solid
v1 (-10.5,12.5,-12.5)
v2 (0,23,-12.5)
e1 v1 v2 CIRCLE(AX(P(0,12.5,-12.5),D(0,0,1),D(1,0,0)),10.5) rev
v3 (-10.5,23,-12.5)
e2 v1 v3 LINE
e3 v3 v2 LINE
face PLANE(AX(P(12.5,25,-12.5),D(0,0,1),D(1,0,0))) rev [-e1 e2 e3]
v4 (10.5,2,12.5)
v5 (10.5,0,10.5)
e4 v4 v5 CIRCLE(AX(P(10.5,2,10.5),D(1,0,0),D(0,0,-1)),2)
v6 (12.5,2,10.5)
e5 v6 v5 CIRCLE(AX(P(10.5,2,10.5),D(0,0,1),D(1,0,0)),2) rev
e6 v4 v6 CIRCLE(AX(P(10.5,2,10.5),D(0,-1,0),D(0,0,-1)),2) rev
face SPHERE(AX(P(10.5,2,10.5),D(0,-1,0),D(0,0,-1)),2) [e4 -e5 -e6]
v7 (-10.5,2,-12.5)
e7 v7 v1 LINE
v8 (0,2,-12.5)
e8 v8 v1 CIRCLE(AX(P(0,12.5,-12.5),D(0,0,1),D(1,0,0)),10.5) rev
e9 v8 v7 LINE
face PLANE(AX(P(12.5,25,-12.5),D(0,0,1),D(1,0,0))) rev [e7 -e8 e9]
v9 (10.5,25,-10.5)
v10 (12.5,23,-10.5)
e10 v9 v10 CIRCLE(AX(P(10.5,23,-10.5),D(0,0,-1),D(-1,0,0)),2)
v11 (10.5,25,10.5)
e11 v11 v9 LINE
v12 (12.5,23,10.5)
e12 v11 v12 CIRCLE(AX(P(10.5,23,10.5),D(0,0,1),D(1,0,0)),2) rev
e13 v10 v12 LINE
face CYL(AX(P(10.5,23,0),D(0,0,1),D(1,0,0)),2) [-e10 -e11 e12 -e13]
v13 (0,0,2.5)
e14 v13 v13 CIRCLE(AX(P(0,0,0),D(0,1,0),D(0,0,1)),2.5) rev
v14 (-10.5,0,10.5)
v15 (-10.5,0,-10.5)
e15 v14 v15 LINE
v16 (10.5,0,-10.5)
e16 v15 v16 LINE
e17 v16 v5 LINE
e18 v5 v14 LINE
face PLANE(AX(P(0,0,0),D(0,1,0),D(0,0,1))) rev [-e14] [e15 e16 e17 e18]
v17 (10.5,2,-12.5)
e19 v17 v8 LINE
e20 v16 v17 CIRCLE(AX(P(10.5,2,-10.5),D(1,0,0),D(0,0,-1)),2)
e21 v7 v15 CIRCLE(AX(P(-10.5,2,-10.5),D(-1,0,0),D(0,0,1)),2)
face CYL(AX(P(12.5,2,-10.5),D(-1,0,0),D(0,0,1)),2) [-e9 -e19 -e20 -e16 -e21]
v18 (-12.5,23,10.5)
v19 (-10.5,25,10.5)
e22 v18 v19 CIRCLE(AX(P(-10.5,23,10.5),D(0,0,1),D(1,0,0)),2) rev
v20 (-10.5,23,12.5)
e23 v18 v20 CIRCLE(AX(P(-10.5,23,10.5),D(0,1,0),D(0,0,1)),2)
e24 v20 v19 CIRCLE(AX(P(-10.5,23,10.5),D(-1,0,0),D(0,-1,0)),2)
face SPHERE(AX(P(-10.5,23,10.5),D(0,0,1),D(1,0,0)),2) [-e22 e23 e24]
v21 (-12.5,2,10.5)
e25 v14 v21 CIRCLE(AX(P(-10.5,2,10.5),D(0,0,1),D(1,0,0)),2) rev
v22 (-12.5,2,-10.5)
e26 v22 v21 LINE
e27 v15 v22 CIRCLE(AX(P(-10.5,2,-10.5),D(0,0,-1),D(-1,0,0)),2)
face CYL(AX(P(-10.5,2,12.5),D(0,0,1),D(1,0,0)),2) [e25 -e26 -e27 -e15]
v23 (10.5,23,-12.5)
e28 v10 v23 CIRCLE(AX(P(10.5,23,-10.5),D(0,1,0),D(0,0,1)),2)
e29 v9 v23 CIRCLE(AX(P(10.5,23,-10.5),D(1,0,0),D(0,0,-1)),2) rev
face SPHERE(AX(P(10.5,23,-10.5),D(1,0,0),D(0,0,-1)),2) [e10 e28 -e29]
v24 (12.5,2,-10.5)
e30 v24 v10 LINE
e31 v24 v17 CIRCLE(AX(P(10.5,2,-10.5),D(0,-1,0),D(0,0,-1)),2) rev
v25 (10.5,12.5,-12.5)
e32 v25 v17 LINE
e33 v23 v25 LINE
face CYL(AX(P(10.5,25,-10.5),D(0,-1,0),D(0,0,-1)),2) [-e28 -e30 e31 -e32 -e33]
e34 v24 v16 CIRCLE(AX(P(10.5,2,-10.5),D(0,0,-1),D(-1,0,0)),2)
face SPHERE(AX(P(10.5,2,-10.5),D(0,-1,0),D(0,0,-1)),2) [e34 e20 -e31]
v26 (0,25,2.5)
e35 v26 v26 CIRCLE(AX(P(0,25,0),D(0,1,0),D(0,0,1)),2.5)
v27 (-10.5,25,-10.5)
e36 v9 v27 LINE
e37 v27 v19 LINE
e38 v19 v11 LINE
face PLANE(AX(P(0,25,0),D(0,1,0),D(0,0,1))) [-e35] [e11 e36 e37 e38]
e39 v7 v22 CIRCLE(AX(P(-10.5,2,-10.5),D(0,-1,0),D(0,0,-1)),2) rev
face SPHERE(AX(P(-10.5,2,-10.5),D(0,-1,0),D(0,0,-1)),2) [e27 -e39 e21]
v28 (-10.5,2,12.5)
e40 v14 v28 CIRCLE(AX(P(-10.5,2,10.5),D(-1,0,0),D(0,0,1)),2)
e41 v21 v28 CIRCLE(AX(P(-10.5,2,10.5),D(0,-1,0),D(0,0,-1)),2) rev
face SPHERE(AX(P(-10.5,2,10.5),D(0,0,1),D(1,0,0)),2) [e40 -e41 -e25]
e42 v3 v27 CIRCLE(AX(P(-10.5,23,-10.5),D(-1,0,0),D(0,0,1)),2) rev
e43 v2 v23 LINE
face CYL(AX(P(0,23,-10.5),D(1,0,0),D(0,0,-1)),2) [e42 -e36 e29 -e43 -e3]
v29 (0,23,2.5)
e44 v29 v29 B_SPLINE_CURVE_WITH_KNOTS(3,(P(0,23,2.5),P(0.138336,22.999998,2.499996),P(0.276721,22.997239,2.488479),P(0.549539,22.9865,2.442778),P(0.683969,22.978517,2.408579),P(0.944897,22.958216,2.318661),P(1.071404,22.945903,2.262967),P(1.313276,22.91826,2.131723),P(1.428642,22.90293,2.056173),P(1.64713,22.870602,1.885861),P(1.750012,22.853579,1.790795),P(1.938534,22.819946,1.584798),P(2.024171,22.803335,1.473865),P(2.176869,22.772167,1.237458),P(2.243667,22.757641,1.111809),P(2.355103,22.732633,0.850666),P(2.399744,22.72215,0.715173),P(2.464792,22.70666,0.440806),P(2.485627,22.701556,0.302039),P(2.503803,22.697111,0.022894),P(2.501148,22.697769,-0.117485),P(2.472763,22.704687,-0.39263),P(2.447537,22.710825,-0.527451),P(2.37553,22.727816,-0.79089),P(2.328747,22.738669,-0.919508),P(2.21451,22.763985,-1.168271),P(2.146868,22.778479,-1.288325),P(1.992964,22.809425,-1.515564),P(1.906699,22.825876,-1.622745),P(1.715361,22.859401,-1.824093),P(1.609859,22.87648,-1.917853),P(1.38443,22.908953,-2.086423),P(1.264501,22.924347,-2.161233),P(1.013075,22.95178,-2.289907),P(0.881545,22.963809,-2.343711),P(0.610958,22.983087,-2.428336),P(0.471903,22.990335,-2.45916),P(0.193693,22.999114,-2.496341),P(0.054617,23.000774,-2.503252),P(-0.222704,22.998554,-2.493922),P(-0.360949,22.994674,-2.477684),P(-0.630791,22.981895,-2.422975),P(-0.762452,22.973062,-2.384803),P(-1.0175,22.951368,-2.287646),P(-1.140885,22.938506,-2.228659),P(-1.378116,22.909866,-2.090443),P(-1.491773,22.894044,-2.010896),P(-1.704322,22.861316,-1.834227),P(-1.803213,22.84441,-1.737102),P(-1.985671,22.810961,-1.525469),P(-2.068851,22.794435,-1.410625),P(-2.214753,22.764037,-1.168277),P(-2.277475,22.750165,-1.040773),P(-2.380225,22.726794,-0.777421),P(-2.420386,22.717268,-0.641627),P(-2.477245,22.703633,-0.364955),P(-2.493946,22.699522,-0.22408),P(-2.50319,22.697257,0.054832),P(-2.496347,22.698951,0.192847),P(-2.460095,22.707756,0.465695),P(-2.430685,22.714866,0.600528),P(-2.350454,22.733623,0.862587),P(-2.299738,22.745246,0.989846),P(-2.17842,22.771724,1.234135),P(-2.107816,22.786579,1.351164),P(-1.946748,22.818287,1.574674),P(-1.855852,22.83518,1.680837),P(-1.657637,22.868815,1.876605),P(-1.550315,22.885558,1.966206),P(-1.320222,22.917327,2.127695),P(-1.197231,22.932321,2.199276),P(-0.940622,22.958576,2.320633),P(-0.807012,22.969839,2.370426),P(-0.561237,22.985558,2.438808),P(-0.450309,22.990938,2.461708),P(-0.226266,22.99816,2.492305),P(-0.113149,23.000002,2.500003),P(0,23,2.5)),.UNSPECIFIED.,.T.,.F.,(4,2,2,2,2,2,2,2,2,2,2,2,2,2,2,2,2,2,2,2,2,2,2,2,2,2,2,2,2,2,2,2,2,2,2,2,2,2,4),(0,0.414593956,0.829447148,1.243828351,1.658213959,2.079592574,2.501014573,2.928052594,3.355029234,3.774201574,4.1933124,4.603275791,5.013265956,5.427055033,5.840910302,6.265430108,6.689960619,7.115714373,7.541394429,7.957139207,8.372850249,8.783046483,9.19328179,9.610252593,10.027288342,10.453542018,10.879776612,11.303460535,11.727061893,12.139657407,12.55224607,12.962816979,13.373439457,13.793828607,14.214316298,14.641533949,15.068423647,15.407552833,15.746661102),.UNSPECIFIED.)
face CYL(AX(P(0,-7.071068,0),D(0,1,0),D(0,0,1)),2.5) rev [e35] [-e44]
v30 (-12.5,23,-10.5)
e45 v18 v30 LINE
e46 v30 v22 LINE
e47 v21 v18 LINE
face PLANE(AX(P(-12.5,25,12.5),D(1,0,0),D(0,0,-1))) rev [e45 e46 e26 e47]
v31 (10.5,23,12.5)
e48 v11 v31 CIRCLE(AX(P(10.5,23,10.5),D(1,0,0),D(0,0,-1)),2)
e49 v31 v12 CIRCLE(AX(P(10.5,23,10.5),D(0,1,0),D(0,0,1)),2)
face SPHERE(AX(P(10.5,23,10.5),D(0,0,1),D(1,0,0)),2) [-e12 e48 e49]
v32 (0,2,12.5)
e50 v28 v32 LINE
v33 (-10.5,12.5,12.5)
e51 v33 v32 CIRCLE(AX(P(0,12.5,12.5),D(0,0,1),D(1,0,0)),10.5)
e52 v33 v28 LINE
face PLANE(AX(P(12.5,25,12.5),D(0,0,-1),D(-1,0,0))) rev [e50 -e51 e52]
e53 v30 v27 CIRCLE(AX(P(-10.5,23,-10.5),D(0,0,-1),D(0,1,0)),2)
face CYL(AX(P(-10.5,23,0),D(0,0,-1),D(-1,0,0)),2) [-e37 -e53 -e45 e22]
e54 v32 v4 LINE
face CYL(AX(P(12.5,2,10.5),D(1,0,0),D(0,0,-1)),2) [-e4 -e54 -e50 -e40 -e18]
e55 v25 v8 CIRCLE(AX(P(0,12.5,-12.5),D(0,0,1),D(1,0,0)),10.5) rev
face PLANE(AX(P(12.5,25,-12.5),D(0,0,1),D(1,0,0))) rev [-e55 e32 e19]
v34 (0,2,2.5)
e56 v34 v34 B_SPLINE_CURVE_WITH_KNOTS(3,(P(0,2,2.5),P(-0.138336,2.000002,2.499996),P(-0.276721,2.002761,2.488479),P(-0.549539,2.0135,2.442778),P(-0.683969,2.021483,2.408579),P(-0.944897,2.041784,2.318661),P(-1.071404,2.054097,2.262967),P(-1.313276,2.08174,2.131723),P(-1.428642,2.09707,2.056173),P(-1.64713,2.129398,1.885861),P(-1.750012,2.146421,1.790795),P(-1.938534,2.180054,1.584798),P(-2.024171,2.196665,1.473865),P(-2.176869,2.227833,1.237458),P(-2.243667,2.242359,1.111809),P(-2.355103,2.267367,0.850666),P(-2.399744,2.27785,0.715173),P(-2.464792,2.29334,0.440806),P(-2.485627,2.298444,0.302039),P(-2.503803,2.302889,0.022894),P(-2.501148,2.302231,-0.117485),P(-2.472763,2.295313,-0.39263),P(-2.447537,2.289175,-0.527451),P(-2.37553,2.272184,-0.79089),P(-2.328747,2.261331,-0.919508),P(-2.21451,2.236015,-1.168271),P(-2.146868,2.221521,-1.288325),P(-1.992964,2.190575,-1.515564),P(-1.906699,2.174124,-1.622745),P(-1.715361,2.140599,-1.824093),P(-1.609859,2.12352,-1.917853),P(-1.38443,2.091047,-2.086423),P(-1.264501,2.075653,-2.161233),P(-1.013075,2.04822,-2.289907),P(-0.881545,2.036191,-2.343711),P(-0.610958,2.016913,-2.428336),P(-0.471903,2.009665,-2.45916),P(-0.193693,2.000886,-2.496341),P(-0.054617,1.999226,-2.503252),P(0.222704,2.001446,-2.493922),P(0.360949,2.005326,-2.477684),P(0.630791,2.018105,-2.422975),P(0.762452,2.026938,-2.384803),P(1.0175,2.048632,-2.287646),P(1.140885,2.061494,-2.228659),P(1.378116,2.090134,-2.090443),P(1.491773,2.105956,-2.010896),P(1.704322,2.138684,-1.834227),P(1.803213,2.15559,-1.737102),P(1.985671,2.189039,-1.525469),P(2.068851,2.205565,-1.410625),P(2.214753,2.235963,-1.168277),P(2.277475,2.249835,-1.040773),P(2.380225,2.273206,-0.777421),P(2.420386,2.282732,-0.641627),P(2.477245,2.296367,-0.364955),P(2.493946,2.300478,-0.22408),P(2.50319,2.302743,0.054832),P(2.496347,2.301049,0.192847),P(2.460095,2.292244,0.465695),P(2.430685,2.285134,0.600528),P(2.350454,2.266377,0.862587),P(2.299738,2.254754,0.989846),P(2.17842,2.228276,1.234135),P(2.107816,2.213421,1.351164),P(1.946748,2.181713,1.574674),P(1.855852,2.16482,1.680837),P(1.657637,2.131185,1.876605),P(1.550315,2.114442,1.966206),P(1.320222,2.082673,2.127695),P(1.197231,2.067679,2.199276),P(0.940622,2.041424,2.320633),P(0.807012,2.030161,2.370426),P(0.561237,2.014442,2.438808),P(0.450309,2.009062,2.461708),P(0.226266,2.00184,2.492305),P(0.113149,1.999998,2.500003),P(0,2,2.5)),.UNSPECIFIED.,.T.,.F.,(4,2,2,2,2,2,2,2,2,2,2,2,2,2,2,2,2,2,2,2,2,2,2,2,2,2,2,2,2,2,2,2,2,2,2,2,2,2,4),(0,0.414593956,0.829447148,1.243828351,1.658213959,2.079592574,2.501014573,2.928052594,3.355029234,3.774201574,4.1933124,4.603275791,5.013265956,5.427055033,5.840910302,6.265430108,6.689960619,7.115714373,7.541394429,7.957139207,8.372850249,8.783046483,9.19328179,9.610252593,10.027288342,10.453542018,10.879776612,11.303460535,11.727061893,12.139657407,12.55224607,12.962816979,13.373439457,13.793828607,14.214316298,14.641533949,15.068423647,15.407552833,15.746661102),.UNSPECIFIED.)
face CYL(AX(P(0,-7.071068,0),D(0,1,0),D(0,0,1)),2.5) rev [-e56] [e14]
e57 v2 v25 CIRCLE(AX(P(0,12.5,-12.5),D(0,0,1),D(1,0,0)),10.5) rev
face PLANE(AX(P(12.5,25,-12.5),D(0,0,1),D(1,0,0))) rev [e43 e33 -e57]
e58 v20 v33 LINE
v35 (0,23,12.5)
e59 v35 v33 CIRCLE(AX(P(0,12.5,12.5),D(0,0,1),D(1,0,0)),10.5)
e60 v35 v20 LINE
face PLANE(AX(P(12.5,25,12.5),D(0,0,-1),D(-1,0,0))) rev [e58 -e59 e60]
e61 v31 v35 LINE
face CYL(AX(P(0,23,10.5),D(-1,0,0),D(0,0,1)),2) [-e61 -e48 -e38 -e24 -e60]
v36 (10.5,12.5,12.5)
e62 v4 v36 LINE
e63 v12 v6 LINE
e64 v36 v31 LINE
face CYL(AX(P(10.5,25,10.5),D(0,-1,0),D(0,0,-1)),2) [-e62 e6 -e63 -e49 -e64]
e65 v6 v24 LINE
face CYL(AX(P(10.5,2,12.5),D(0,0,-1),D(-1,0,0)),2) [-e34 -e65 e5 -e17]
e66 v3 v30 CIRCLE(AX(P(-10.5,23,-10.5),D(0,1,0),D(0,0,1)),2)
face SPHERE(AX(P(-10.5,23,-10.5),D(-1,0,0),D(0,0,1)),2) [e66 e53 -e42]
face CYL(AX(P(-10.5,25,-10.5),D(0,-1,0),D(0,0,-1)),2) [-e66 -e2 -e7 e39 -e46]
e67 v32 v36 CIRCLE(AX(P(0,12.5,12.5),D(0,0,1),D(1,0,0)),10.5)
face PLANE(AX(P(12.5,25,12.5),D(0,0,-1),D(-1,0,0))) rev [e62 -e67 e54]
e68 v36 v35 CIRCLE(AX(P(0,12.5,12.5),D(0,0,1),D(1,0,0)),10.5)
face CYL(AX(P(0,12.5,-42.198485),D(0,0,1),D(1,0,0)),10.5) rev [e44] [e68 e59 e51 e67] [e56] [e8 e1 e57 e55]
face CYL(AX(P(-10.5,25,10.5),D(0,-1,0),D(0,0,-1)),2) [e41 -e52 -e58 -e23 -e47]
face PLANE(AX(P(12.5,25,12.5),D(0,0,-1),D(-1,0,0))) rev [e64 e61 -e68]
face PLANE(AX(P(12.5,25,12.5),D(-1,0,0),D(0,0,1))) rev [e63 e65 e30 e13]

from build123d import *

# Parameters (mm, degrees)
SKETCH1_W           = 25
SKETCH1_H           = 25
BOSS_EXTRUDE1_DEPTH = 25
SKETCH2_R           = 10.5
CUT_EXTRUDE1_DEPTH  = 25
CUT_EXTRUDE2_REACH  = 32.619
SKETCH3_R           = 2.5
FILLET1_R           = 2


with BuildPart() as part:
    # Sketch1 → Boss-Extrude1 (new body)
    with BuildSketch(Plane(origin=(0, 0, 0), x_dir=(1, 0, 0), z_dir=(0, 1, 0))):
        Rectangle(SKETCH1_W, SKETCH1_H)
    extrude(amount=BOSS_EXTRUDE1_DEPTH)

    # Sketch2 → Cut-Extrude1 (cut)
    with BuildSketch(Plane.XY.offset(12.5)):
        with Locations((0, 12.5)):
            Circle(SKETCH2_R)
    extrude(amount=-CUT_EXTRUDE1_DEPTH, mode=Mode.SUBTRACT)

    # Cut-Extrude2: up to this face of the body (flat: up to its plane)
    cut_extrude2_end = Plane(part.part.faces().sort_by_distance((0, 0, 0))[0])
    # Sketch3 → Cut-Extrude2 (cut, up to the picked face)
    with BuildSketch(Plane(origin=(0, 25, 0), x_dir=(1, 0, 0), z_dir=(0, 1, 0)), mode=Mode.PRIVATE) as cut_extrude2_sk1:
        with Locations(Location((0, 0, 0), (0, 0, 270))):
            Circle(SKETCH3_R)
    cut_extrude2_tool1 = split(extrude(cut_extrude2_sk1.sketch, amount=-CUT_EXTRUDE2_REACH, mode=Mode.PRIVATE), bisect_by=cut_extrude2_end, keep=Keep.BOTH, mode=Mode.PRIVATE)
    add(cut_extrude2_tool1.solids().sort_by(Axis((0, 25, 0), (0, -1, 0)))[0], mode=Mode.SUBTRACT)

    # Fillet1
    fillet1_edges = [part.edges().sort_by_distance(p)[0] for p in [
        (12.5, 25, 0),
        (0, 25, -12.5),
        (-12.5, 25, 0),
        (0, 0, -12.5),
        (12.5, 0, 0),
        (0, 0, 12.5),
        (-12.5, 0, 0),
        (-12.5, 12.5, -12.5),
        (12.5, 12.5, -12.5),
        (12.5, 12.5, 12.5),
        (-12.5, 12.5, 12.5),
        (0, 25, 12.5),
    ]]
    fillet(fillet1_edges, radius=FILLET1_R - 0.0001)  # a hair under: the kernel refuses the full size


solid = part.part
